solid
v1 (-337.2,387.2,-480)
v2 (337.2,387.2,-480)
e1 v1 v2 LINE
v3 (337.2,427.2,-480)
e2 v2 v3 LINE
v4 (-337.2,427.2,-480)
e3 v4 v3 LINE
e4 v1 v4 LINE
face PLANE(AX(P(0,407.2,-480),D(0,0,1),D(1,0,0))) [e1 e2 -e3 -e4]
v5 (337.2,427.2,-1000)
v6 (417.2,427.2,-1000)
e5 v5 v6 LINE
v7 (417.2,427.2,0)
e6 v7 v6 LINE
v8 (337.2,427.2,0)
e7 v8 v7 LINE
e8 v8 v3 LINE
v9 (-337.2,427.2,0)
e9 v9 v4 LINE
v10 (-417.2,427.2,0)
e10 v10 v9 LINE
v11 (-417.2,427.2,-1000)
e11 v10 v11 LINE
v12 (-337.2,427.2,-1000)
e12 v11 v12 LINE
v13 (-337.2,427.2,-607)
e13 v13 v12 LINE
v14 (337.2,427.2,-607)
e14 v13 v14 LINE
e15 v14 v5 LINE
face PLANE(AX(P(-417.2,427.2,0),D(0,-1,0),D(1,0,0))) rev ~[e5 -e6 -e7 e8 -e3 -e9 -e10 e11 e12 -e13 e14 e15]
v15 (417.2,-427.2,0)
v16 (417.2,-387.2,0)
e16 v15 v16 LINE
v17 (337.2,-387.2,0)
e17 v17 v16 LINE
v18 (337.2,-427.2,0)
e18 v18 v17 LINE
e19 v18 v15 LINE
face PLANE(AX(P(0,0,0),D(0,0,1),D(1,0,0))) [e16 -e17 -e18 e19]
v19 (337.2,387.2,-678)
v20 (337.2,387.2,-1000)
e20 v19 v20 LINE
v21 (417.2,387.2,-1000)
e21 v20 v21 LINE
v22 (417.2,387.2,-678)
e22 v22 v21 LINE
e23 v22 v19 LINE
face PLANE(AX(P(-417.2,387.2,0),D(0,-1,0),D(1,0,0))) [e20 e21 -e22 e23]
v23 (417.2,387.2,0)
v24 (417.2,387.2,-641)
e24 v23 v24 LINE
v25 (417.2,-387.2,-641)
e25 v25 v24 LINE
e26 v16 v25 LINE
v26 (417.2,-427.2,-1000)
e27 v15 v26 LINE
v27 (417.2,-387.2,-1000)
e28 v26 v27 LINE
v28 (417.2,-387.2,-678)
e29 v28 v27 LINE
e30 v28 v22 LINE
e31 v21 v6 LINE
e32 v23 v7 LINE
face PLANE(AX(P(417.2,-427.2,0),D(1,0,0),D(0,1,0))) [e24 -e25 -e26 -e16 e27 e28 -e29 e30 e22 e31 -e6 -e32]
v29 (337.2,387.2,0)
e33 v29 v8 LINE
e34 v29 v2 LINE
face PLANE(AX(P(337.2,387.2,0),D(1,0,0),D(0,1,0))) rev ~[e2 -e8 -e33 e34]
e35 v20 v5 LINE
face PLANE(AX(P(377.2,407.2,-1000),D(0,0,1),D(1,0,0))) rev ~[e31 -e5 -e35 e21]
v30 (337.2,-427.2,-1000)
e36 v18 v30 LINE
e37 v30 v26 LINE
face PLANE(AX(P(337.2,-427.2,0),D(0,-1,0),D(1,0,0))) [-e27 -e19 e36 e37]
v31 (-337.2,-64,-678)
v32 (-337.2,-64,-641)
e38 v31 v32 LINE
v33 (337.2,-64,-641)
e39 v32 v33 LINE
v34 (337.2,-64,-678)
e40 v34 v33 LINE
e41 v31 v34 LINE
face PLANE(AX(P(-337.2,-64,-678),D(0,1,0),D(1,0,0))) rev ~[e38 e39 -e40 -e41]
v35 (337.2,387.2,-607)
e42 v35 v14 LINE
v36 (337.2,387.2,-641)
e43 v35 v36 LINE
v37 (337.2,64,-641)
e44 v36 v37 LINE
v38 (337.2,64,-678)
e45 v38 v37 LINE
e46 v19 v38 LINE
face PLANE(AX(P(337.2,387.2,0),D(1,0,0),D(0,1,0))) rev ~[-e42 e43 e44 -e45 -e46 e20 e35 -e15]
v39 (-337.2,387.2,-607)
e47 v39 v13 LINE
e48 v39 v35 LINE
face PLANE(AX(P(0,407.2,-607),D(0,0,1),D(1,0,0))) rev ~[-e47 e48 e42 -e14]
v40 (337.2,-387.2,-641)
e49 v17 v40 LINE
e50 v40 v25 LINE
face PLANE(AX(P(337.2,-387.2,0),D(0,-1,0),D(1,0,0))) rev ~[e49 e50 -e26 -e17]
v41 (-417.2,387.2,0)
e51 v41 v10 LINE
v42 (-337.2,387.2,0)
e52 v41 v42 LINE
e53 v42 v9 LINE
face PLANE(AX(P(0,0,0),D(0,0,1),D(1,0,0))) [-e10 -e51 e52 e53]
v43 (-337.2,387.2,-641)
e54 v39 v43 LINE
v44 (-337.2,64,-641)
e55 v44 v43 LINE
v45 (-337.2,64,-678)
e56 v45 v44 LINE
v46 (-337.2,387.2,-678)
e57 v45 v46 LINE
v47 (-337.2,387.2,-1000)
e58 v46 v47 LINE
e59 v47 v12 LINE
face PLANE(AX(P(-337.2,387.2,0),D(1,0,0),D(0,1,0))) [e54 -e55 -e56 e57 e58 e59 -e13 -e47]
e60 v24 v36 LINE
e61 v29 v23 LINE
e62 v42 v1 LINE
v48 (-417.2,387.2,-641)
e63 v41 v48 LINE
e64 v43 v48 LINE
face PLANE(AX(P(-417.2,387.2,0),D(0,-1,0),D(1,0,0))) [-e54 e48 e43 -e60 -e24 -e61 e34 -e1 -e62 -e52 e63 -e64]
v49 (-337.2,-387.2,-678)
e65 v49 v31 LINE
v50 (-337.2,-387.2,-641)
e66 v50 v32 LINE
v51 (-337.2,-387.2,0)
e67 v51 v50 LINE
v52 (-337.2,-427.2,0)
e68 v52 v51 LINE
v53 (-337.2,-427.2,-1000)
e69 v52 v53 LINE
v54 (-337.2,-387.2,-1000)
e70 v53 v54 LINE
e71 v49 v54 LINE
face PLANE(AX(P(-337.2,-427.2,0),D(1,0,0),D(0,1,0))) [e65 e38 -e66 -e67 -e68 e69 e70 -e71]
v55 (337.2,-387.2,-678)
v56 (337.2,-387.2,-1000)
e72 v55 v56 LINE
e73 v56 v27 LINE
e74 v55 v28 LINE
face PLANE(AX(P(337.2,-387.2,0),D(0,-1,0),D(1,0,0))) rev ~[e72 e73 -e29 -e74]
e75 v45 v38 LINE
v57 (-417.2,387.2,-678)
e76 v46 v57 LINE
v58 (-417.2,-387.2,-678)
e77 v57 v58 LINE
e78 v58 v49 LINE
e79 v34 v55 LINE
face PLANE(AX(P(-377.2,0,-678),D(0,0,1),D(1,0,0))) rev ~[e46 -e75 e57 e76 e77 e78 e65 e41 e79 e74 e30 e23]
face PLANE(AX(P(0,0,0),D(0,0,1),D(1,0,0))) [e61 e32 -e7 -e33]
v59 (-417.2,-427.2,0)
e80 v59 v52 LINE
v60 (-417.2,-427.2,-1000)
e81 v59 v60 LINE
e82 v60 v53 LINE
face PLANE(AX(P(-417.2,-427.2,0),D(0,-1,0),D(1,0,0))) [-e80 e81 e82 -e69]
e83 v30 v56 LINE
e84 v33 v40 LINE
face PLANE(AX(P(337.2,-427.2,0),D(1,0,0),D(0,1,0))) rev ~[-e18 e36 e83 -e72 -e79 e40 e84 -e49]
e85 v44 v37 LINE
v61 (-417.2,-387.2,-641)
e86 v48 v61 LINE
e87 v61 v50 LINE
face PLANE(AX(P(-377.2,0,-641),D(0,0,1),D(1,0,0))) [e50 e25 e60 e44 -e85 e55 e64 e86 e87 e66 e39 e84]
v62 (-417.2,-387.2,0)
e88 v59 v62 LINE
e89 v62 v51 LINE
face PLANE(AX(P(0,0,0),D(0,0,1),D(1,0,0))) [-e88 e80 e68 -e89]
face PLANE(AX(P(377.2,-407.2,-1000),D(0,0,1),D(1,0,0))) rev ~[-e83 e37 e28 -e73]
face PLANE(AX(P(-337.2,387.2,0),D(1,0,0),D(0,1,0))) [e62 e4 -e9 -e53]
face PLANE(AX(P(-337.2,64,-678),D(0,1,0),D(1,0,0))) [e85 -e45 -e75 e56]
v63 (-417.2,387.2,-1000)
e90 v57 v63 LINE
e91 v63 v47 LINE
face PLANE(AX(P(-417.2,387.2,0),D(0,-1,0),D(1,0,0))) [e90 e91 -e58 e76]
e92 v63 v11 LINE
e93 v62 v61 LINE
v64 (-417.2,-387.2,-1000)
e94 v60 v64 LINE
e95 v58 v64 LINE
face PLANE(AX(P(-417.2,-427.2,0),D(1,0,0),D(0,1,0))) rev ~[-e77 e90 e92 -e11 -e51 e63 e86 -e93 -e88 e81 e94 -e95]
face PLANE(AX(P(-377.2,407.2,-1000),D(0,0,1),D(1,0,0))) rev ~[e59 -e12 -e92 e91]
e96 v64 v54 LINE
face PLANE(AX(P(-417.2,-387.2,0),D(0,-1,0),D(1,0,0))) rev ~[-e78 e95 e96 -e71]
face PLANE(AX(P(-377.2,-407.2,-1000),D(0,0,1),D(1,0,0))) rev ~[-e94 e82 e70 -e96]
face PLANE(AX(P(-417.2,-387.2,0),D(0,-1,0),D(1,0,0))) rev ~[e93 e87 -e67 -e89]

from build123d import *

# Parameters (mm, degrees)
F0_W     = 914.4
F0_H     = 914.4
F0_W_2   = 80
F0_H_2   = 40
F1_DEPTH = 40
F2_DEPTH = 1000
F4_W     = 674.4
F4_H     = 40
F5_DEPTH = 127
F7_W     = 674.4
F7_H     = 128
F8_DEPTH = 37
F9_DEPTH = 40


# Not quite as in the source:
# - a feature names something its author has since deleted; it is built from what else it names


with BuildPart() as f1:
    # F0 (on Top) → F1 (new body)
    with BuildSketch(Plane.XY):
        Rectangle(F0_W, F0_H)
        with Locations((-377.2, -407.2)):
            Rectangle(F0_W_2, F0_H_2, mode=Mode.SUBTRACT)
        with Locations((377.2, -407.2)):
            Rectangle(F0_W_2, F0_H_2, mode=Mode.SUBTRACT)
        with Locations((-377.2, 407.2)):
            Rectangle(F0_W_2, F0_H_2, mode=Mode.SUBTRACT)
        with Locations((377.2, 407.2)):
            Rectangle(F0_W_2, F0_H_2, mode=Mode.SUBTRACT)
        with Locations((-377.2, -407.2)):
            Rectangle(F0_W_2, F0_H_2)
        with Locations((377.2, 407.2)):
            Rectangle(F0_W_2, F0_H_2)
        with Locations((377.2, -407.2)):
            Rectangle(F0_W_2, F0_H_2)
        with Locations((-377.2, 407.2)):
            Rectangle(F0_W_2, F0_H_2)
    extrude(amount=F1_DEPTH)

    # F0 (on Top) → F2 (join)
    with BuildSketch(Plane.XY):
        with Locations((-377.2, -407.2)):
            Rectangle(F0_W_2, F0_H_2)
        with Locations((-377.2, 407.2)):
            Rectangle(F0_W_2, F0_H_2)
        with Locations((377.2, -407.2)):
            Rectangle(F0_W_2, F0_H_2)
        with Locations((377.2, 407.2)):
            Rectangle(F0_W_2, F0_H_2)
    extrude(amount=-F2_DEPTH)

    # F4 (on offset) → F5 (join)
    with BuildSketch(Plane.XY.offset(-607)):
        with Locations((0, 407.2)):
            Rectangle(F4_W, F4_H)
    extrude(amount=F5_DEPTH)

    # F7 (on offset) → F8 (join)
    with BuildSketch(Plane.XY.offset(-678)):
        Polygon((-417.2, 387.2), (-417.2, -387.2), (-337.2, -387.2), (-337.2, -64), (-337.2, 64), (-337.2, 387.2), align=None)
        Polygon((337.2, 64), (337.2, -64), (337.2, -387.2), (417.2, -387.2), (417.2, 387.2), (337.2, 387.2), align=None)
        Rectangle(F7_W, F7_H)
    extrude(amount=F8_DEPTH)

    # F9 (cut): a face of the model
    f9_faces = [f1.faces().sort_by_distance(p)[0] for p in [
        (0, 0, 40),
    ]]
    extrude(f9_faces, amount=-F9_DEPTH, mode=Mode.SUBTRACT)


solid = f1.part
